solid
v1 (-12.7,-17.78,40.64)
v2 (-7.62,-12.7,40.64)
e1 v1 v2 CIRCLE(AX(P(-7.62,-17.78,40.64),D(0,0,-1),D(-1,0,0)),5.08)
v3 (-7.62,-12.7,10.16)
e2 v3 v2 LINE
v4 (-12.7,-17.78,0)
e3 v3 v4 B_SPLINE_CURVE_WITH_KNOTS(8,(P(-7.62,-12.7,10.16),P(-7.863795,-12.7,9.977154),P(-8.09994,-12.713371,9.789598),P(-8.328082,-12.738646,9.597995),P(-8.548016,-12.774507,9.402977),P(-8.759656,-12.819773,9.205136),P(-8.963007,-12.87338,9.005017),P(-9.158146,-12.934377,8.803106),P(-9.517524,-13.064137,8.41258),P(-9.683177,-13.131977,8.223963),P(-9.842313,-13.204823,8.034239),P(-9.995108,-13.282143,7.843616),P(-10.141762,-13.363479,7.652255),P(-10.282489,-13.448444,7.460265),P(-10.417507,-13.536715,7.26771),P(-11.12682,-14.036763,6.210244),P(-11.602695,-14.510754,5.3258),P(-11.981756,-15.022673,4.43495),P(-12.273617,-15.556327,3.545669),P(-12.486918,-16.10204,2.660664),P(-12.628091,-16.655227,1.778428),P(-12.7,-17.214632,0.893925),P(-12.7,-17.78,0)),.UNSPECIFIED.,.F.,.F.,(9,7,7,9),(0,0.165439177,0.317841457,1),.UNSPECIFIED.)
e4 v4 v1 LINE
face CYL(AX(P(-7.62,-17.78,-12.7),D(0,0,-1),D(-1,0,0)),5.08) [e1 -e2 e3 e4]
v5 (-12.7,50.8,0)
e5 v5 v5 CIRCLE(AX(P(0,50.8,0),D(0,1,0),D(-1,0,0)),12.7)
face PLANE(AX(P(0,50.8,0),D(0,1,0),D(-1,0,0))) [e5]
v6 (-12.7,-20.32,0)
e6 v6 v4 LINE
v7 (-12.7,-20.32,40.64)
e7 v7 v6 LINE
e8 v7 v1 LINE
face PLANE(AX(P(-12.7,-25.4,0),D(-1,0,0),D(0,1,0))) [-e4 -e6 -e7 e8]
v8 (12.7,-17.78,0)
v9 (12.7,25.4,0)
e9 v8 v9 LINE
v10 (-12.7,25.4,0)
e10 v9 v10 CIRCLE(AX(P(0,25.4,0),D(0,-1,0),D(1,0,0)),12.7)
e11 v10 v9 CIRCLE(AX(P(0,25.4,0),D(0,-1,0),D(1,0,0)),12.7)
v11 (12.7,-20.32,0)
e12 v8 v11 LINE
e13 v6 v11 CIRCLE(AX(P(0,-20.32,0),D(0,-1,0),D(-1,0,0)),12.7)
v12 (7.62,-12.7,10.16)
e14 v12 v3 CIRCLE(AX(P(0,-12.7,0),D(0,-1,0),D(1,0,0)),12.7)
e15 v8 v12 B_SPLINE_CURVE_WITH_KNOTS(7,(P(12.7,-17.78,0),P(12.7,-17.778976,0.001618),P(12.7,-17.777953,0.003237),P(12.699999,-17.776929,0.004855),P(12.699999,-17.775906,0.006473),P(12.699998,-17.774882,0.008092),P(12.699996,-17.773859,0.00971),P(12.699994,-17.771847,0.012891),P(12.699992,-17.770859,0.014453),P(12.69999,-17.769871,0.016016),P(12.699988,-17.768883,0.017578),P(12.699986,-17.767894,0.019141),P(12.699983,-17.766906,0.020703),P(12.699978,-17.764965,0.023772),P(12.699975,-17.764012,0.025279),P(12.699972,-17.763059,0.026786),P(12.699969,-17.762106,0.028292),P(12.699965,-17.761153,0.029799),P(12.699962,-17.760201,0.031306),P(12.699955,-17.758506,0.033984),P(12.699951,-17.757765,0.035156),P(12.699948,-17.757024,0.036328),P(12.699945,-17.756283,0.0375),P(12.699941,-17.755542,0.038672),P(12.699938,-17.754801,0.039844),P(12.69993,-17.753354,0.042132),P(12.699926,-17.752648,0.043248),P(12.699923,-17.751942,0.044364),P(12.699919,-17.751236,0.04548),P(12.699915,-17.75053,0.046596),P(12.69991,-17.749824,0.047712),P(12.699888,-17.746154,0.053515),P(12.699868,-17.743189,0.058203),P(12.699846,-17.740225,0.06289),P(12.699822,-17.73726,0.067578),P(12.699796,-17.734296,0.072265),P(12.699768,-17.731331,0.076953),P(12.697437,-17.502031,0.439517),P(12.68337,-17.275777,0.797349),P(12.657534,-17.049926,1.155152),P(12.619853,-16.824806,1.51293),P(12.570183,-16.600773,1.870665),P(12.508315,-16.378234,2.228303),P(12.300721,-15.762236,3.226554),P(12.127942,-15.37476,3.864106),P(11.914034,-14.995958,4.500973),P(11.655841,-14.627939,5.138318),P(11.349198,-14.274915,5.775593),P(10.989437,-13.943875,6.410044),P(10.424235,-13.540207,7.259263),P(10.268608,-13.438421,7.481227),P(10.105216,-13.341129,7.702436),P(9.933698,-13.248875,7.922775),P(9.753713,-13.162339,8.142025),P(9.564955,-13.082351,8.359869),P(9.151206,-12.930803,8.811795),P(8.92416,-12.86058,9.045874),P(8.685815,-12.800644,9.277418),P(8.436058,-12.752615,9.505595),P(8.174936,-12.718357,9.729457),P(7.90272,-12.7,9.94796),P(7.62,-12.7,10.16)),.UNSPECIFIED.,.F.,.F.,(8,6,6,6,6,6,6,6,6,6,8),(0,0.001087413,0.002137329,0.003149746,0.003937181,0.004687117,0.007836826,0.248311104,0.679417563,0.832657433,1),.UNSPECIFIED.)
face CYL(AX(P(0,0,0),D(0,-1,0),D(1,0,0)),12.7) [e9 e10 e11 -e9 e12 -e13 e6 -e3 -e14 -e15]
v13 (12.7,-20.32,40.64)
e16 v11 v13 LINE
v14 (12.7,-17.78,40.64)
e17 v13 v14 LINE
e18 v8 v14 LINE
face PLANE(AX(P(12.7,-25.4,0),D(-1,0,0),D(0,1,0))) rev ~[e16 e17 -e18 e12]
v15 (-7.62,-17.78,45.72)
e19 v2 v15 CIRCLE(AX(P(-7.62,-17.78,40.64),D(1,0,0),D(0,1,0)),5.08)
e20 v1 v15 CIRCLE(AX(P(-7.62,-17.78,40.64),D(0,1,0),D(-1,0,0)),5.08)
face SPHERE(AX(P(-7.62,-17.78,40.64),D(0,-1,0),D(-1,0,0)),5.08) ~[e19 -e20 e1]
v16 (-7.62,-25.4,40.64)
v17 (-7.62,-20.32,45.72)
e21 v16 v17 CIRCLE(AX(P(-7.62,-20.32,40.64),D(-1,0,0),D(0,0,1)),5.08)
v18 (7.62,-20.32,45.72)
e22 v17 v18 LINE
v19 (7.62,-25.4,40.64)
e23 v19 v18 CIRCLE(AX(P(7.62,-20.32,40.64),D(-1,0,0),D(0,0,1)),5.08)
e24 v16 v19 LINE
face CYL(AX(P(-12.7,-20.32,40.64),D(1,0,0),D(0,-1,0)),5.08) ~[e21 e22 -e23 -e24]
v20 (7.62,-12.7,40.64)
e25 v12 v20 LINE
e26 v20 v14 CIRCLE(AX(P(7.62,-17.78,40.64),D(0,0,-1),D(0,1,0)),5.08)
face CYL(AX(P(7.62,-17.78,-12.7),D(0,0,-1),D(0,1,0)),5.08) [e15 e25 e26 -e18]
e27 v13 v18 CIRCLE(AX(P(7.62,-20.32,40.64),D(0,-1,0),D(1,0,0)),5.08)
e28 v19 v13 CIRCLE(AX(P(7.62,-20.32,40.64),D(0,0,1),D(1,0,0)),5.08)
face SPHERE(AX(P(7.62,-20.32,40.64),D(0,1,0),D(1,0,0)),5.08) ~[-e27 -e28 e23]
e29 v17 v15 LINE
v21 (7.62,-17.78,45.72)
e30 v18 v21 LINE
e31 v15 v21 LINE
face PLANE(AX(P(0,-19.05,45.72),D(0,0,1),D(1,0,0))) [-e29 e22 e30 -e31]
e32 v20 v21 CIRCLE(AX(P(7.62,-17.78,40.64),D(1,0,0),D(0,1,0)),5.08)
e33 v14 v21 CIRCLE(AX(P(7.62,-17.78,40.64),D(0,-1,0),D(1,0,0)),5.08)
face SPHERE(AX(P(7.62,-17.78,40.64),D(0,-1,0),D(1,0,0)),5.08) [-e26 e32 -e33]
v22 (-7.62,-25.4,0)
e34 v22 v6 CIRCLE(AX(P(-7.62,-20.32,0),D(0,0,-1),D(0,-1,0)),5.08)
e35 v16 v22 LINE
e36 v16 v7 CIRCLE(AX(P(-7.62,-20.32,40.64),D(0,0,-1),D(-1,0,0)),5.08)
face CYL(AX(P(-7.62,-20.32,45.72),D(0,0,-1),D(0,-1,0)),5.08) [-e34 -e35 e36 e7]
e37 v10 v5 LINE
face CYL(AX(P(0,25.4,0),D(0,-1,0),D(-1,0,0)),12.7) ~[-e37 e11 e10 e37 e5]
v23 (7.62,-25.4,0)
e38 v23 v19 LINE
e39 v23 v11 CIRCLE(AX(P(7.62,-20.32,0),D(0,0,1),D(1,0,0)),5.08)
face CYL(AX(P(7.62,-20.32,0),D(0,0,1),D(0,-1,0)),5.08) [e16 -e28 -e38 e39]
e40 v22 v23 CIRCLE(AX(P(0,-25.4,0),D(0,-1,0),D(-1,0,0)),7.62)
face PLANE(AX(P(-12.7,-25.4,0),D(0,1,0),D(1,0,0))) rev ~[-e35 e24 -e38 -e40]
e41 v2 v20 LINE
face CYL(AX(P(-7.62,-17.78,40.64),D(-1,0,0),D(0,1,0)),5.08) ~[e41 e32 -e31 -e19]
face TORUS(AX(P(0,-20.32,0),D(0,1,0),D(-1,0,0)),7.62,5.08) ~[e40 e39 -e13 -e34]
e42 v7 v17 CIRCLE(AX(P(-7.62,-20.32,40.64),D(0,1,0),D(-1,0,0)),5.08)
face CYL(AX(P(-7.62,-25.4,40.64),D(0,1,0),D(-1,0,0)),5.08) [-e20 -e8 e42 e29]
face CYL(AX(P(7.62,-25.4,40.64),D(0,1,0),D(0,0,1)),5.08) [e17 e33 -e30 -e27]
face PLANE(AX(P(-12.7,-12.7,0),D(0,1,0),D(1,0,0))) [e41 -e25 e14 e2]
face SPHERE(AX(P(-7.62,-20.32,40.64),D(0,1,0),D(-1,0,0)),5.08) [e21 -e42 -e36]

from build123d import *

# Parameters (mm, degrees)
F0_R         = 12.7
F1_DEPTH     = 25.4
F2_W         = 25.4
F2_H         = 12.7
F3_DEPTH     = 45.72
F4_R         = 5.08
F5_T1_DEPTH  = 15.24
F5_T6_DEPTH  = 53.34
F5_S7_R      = 12.7
F5_T8_DEPTH  = 28
F5_T10_ANGLE = 90
F5_T14_DEPTH = 53.34
F5_S15_R     = 12.7
F5_T16_DEPTH = 28
F5_T18_ANGLE = 90
F6_R         = 12.7
F7_DEPTH     = 25.4


# Not quite as in the source:
# - a fillet or chamfer that OpenCascade refuses, or shapes differently, is made with other operations: its cross-section is extruded or revolved along the edge and cut away or added


with BuildPart() as f1:
    # F0 (on Front) → F1 (new body, symmetric)
    with BuildSketch(Plane.XZ):
        Circle(F0_R)
    extrude(amount=F1_DEPTH, both=True)

    # F2 (on Top) → F3 (join)
    with BuildSketch(Plane.XY):
        with Locations((0, -19.05)):
            Rectangle(F2_W, F2_H)
    extrude(amount=F3_DEPTH)

    # F4
    f4_edges = [f1.edges().sort_by_distance(p)[0] for p in [
        (-12.7, -19.05, 45.72),
        (12.7, -19.05, 45.72),
        (0, -25.4, -12.7),
        (0, -25.4, 45.72),
    ]]
    fillet(f4_edges, radius=F4_R)

    # F5: fillet of radius 5.08 on 5 edges, made by hand

    # F5_s2 → F5_t1 (cut)
    with BuildSketch(Plane.YZ.offset(-7.62)):
        with BuildLine():
            ThreePointArc((-12.7, 40.64), (-14.1878975516, 44.2321024484), (-17.78, 45.72))
            Line((-17.78, 45.72), (-12.7, 45.72))
            Line((-12.7, 45.72), (-12.7, 40.64))
        make_face()
    extrude(amount=F5_T1_DEPTH, mode=Mode.SUBTRACT)


with BuildPart() as f5_tool4:
    # F5_s5 → F5_t6 (new body)
    with BuildSketch(Plane.XY.offset(-12.7)):
        with BuildLine():
            ThreePointArc((-12.7, -17.78), (-11.2121024484, -14.1878975516), (-7.62, -12.7))
            Line((-7.62, -12.7), (-12.7, -12.7))
            Line((-12.7, -12.7), (-12.7, -17.78))
        make_face()
    extrude(amount=F5_T6_DEPTH)

    # F5_s7 → F5_t8 (cut, symmetric)
    with BuildSketch(Plane.XZ.offset(15.2)):
        Circle(F5_S7_R)
    extrude(amount=F5_T8_DEPTH, both=True, mode=Mode.SUBTRACT)


with BuildPart() as f1_1:
    add(f1.part)

    # F5_t3: cut F5_tool4
    add(f5_tool4.part, mode=Mode.SUBTRACT)

    # F5_s9 → F5_t10 (revolve, cut)
    with BuildSketch(Plane.XY.offset(40.64)):
        with BuildLine():
            ThreePointArc((-7.62, -12.7), (-11.2121024484, -14.1878975516), (-12.7, -17.78))
            Line((-12.7, -17.78), (-12.7, -12.7))
            Line((-12.7, -12.7), (-7.62, -12.7))
        make_face()
    revolve(axis=Axis((-7.62, -12.7, 40.64), (0, 1, 0)), revolution_arc=F5_T10_ANGLE, mode=Mode.SUBTRACT)


with BuildPart() as f5_tool12:
    # F5_s13 → F5_t14 (new body)
    with BuildSketch(Plane.XY.offset(-12.7)):
        with BuildLine():
            ThreePointArc((7.62, -12.7), (11.2121024484, -14.1878975516), (12.7, -17.78))
            Line((12.7, -17.78), (12.7, -12.7))
            Line((12.7, -12.7), (7.62, -12.7))
        make_face()
    extrude(amount=F5_T14_DEPTH)

    # F5_s15 → F5_t16 (cut, symmetric)
    with BuildSketch(Plane.XZ.offset(15.2)):
        Circle(F5_S15_R)
    extrude(amount=F5_T16_DEPTH, both=True, mode=Mode.SUBTRACT)


with BuildPart() as f1_2:
    add(f1_1.part)

    # F5_t11: cut F5_tool12
    add(f5_tool12.part, mode=Mode.SUBTRACT)

    # F5_s17 → F5_t18 (revolve, cut)
    with BuildSketch(Plane.XY.offset(40.64)):
        with BuildLine():
            ThreePointArc((7.62, -12.7), (11.2121024484, -14.1878975516), (12.7, -17.78))
            Line((12.7, -17.78), (12.7, -12.7))
            Line((12.7, -12.7), (7.62, -12.7))
        make_face()
    revolve(axis=Axis((7.62, -12.7, 40.64), (0, -1, 0)), revolution_arc=F5_T18_ANGLE, mode=Mode.SUBTRACT)

    # F6 (on face) → F7 (join)
    with BuildSketch(Plane(origin=(0, 25.4, 0), x_dir=(-1, 0, 0), z_dir=(0, 1, 0))):
        Circle(F6_R)
    extrude(amount=F7_DEPTH)


solid = f1_2.part
